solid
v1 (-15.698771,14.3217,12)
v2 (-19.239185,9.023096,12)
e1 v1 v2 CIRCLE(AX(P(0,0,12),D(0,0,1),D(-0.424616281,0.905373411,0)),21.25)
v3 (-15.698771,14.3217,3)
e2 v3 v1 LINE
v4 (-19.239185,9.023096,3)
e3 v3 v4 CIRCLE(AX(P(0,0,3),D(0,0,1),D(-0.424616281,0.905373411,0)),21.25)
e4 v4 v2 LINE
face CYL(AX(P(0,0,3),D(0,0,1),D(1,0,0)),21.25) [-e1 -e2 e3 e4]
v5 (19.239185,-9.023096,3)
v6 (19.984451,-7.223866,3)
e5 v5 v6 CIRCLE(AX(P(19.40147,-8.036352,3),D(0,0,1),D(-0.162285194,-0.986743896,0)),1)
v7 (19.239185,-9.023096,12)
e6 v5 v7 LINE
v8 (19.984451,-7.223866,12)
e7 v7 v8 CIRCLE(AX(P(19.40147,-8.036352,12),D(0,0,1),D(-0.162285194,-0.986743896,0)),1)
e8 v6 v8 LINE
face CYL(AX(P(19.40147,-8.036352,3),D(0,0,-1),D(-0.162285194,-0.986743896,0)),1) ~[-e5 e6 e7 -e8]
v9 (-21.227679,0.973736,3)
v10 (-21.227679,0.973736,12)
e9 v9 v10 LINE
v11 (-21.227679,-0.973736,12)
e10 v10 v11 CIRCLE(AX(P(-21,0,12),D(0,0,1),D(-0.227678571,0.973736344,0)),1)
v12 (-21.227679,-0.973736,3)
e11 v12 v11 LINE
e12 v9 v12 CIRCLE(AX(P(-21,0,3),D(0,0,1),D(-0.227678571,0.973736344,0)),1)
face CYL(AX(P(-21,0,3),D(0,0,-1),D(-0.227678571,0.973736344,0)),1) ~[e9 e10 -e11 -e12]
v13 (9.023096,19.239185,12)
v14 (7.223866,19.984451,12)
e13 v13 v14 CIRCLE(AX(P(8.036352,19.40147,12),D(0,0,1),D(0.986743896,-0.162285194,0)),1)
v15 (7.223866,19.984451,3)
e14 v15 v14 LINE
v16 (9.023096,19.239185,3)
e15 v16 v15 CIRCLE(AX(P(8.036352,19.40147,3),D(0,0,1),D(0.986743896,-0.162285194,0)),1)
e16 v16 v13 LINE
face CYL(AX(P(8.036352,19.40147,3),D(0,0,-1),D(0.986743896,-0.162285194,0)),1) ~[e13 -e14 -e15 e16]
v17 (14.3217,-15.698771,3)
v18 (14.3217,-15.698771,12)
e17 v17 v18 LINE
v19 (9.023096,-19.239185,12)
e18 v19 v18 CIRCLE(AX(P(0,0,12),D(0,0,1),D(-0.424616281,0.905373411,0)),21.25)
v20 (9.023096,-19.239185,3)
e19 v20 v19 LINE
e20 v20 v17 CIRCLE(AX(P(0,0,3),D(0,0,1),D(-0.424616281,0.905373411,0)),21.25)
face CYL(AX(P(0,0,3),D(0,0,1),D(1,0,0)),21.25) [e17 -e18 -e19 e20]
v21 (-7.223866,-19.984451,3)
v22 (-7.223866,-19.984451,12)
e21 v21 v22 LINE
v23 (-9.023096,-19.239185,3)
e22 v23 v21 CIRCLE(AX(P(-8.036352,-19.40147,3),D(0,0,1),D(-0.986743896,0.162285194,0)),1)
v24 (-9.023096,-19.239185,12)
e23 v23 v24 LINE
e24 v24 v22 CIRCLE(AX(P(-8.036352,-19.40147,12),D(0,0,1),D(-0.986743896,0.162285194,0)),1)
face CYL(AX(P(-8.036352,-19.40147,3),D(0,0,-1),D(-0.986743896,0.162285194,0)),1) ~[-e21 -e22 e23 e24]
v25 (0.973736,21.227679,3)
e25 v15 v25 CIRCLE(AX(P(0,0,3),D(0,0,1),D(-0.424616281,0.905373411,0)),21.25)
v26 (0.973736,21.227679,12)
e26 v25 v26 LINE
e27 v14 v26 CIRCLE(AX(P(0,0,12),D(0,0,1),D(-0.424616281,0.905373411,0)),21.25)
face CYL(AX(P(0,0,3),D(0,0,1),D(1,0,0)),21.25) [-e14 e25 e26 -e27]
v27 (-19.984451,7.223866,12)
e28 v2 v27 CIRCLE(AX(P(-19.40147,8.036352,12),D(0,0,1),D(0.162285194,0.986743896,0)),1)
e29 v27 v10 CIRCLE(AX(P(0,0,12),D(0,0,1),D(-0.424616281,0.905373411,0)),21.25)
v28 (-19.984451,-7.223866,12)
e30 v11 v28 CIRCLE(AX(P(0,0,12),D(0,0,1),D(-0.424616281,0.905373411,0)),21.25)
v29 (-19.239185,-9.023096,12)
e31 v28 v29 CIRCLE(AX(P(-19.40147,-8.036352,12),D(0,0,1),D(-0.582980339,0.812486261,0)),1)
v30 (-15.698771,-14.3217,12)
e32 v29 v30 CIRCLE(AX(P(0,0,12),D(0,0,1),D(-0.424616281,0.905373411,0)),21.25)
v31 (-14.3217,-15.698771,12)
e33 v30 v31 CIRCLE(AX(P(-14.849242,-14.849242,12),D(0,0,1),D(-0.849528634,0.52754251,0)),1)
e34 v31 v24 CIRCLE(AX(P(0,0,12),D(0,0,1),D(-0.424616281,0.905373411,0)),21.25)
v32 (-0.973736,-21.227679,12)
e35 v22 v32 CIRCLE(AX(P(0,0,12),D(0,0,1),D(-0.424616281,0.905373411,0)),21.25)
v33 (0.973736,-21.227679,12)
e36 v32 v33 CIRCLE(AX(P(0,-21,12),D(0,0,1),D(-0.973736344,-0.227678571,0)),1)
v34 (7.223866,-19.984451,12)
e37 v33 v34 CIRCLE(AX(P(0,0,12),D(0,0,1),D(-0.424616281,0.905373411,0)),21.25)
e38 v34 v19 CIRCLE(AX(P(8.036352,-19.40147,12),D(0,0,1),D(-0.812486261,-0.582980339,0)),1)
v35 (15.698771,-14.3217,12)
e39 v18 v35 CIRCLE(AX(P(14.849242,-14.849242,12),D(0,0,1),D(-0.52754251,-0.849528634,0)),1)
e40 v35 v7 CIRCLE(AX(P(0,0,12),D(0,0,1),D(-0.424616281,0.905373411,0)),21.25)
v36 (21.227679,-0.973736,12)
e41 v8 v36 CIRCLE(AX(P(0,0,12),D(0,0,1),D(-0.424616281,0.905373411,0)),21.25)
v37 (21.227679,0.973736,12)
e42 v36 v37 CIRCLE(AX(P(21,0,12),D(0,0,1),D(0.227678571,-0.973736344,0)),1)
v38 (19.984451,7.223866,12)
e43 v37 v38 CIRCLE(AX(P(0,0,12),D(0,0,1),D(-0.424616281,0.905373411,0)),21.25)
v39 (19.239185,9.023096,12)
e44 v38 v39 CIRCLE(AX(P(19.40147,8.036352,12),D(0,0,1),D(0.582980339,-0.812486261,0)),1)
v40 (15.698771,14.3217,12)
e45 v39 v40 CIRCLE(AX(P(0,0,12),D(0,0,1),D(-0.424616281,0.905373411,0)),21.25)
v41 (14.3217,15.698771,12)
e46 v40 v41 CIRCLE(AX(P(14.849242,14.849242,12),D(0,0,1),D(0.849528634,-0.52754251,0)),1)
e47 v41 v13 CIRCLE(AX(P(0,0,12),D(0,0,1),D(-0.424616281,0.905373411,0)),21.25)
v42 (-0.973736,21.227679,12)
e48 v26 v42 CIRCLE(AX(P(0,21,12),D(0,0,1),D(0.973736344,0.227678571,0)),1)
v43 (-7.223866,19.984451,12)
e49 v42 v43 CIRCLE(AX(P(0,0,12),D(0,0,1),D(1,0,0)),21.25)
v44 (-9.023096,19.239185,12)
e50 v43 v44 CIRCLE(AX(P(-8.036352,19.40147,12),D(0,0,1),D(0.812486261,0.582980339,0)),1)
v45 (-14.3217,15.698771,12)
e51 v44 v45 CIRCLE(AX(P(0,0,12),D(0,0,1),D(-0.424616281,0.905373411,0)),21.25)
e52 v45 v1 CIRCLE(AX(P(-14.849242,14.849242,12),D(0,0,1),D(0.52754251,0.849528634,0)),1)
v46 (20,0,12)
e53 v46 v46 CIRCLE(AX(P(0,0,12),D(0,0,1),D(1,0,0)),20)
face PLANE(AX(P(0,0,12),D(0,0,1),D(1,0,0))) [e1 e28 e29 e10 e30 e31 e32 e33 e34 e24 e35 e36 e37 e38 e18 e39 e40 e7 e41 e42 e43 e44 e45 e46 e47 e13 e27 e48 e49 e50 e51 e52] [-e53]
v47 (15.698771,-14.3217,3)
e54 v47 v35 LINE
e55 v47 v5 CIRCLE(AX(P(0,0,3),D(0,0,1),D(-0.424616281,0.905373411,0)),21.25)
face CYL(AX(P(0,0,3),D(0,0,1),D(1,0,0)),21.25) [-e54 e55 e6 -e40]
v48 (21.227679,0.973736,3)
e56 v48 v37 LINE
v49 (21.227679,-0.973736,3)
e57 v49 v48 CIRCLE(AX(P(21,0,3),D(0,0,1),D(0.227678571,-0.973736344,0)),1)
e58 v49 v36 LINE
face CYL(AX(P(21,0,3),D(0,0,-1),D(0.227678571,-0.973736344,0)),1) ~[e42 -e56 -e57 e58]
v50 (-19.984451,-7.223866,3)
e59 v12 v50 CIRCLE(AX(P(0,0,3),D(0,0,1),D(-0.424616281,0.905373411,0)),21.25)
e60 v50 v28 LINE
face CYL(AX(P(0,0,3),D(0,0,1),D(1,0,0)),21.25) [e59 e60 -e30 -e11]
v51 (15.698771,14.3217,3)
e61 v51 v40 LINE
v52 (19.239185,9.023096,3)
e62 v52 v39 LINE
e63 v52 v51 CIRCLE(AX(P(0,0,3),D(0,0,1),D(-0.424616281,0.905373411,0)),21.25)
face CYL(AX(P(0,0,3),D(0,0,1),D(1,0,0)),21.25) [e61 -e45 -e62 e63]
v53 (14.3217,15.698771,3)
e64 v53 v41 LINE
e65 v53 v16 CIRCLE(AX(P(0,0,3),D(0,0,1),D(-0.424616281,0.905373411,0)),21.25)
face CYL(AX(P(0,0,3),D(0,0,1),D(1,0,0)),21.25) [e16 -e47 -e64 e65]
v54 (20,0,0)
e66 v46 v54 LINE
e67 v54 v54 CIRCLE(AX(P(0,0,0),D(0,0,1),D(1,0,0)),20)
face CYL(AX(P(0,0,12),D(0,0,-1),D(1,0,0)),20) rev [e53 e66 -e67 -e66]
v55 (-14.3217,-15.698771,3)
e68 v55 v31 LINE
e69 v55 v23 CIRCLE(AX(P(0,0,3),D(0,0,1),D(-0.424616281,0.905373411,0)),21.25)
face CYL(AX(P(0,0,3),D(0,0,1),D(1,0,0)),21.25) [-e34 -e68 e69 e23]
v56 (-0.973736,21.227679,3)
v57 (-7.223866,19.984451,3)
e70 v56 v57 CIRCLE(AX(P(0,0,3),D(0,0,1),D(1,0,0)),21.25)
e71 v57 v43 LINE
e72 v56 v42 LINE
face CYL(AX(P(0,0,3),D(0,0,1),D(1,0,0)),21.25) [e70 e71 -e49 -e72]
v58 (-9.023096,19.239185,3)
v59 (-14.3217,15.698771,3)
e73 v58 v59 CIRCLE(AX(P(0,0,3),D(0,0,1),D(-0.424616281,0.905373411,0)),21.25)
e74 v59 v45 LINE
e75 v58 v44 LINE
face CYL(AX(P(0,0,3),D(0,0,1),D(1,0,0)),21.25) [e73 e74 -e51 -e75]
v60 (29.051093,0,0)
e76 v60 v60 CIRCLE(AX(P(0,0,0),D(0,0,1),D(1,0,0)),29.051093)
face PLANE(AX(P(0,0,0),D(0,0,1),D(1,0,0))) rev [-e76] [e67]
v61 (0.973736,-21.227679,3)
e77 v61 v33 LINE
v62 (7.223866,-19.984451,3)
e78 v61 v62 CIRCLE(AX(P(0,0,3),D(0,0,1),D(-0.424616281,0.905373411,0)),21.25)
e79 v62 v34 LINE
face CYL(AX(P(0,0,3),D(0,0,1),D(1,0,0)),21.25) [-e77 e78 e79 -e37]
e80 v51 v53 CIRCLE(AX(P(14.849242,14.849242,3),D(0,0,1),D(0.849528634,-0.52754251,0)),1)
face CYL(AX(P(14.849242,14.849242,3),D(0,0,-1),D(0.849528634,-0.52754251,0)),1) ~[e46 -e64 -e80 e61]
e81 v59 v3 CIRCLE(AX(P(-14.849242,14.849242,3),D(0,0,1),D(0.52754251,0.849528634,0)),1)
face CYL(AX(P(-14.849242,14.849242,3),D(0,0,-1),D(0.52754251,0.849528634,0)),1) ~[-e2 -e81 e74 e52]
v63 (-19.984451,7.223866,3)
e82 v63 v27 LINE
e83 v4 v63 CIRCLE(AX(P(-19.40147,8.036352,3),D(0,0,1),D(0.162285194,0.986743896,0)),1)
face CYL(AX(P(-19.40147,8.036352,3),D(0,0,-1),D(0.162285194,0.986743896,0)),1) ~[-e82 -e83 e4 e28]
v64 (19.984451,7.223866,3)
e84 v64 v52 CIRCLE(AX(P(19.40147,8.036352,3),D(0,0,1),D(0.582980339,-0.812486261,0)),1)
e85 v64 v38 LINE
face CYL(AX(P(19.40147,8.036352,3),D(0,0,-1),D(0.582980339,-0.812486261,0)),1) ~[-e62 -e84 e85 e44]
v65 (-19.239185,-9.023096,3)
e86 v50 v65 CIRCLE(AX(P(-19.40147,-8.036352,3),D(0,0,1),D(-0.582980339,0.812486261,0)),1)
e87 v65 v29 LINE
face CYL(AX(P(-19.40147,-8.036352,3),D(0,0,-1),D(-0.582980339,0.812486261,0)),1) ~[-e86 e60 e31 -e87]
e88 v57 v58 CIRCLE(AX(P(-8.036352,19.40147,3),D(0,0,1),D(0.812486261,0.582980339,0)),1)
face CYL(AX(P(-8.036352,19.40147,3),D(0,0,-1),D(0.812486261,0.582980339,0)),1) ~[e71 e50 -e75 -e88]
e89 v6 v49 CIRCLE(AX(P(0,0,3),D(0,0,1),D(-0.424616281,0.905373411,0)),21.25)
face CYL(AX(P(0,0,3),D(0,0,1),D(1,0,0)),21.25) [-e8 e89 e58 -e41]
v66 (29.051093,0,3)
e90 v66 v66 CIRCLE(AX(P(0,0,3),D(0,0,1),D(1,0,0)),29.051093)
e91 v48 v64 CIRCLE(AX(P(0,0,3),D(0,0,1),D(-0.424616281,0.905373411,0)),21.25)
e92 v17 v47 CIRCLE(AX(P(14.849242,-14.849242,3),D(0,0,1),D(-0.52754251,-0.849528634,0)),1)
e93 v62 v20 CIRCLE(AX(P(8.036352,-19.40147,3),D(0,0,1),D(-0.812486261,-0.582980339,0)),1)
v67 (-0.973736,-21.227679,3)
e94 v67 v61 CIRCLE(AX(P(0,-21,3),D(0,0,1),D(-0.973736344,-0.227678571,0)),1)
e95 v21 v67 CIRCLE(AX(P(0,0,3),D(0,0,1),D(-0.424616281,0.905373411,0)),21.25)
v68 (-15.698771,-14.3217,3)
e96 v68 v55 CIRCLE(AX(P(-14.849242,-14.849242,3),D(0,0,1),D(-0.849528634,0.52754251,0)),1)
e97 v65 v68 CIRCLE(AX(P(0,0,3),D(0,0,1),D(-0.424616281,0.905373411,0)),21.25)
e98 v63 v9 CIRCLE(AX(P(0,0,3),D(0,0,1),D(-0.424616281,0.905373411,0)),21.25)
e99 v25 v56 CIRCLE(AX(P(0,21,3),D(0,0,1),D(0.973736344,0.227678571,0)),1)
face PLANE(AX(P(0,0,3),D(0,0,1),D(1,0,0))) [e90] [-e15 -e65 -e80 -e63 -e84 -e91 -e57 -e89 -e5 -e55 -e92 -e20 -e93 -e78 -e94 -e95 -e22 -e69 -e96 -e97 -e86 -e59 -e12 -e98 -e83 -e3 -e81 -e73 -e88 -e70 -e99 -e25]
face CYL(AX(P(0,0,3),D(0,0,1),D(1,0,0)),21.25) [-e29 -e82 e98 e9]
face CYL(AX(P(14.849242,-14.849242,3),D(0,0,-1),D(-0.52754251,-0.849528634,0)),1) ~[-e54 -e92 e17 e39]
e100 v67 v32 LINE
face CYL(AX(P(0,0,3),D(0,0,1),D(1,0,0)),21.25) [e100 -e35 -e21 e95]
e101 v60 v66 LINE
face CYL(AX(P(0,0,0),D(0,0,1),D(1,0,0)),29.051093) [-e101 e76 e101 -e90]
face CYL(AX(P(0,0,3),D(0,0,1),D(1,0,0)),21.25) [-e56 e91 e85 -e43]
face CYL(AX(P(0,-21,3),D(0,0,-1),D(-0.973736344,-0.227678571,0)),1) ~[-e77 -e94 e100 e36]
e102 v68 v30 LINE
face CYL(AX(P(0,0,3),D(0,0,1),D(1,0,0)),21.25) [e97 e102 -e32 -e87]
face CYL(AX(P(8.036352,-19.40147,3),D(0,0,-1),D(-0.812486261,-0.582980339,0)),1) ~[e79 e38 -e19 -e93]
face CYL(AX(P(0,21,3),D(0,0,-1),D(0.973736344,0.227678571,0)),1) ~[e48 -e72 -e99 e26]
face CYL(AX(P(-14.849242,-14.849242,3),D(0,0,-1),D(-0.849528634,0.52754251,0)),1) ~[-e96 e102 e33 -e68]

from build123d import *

# Parameters (mm, degrees)
F3_DEPTH        = 9
F3_COPIES_COUNT = 16


# Not quite as in the source:
# - a pattern or mirror of a feature is missing from the dataset's text; its kind, count and spacing are read off the source's solid


with BuildPart() as f1:
    # F0 (on Front) → F1 (revolve)
    with BuildSketch(Plane.XZ):
        Polygon((20, 12), (20, 0), (29.0510931471, 0), (29.0510931471, 3), (21.25, 3), (21.25, 12), align=None)
    revolve(axis=Axis((0, 0, 7.2627740937), (0, 0, 1)))

    # F2 (on face) → F3 (join, through all)
    with BuildSketch(Plane.XY.offset(3)):
        with BuildLine():
            ThreePointArc((-0.9737363442, 21.2276785714), (0, 21.25), (0.9737363442, 21.2276785714))
            ThreePointArc((0.9737363442, 21.2276785714), (0, 22), (-0.9737363442, 21.2276785714))
        make_face()
    f3 = extrude(amount=F3_DEPTH)

    # F3_copies: F3 ×16 about axis
    f3_copies_axis = Axis((0, 0, 0), (0, 0, 1))
    for i in range(1, F3_COPIES_COUNT):
        add(f3.rotate(f3_copies_axis, i * 360 / F3_COPIES_COUNT))


solid = f1.part
